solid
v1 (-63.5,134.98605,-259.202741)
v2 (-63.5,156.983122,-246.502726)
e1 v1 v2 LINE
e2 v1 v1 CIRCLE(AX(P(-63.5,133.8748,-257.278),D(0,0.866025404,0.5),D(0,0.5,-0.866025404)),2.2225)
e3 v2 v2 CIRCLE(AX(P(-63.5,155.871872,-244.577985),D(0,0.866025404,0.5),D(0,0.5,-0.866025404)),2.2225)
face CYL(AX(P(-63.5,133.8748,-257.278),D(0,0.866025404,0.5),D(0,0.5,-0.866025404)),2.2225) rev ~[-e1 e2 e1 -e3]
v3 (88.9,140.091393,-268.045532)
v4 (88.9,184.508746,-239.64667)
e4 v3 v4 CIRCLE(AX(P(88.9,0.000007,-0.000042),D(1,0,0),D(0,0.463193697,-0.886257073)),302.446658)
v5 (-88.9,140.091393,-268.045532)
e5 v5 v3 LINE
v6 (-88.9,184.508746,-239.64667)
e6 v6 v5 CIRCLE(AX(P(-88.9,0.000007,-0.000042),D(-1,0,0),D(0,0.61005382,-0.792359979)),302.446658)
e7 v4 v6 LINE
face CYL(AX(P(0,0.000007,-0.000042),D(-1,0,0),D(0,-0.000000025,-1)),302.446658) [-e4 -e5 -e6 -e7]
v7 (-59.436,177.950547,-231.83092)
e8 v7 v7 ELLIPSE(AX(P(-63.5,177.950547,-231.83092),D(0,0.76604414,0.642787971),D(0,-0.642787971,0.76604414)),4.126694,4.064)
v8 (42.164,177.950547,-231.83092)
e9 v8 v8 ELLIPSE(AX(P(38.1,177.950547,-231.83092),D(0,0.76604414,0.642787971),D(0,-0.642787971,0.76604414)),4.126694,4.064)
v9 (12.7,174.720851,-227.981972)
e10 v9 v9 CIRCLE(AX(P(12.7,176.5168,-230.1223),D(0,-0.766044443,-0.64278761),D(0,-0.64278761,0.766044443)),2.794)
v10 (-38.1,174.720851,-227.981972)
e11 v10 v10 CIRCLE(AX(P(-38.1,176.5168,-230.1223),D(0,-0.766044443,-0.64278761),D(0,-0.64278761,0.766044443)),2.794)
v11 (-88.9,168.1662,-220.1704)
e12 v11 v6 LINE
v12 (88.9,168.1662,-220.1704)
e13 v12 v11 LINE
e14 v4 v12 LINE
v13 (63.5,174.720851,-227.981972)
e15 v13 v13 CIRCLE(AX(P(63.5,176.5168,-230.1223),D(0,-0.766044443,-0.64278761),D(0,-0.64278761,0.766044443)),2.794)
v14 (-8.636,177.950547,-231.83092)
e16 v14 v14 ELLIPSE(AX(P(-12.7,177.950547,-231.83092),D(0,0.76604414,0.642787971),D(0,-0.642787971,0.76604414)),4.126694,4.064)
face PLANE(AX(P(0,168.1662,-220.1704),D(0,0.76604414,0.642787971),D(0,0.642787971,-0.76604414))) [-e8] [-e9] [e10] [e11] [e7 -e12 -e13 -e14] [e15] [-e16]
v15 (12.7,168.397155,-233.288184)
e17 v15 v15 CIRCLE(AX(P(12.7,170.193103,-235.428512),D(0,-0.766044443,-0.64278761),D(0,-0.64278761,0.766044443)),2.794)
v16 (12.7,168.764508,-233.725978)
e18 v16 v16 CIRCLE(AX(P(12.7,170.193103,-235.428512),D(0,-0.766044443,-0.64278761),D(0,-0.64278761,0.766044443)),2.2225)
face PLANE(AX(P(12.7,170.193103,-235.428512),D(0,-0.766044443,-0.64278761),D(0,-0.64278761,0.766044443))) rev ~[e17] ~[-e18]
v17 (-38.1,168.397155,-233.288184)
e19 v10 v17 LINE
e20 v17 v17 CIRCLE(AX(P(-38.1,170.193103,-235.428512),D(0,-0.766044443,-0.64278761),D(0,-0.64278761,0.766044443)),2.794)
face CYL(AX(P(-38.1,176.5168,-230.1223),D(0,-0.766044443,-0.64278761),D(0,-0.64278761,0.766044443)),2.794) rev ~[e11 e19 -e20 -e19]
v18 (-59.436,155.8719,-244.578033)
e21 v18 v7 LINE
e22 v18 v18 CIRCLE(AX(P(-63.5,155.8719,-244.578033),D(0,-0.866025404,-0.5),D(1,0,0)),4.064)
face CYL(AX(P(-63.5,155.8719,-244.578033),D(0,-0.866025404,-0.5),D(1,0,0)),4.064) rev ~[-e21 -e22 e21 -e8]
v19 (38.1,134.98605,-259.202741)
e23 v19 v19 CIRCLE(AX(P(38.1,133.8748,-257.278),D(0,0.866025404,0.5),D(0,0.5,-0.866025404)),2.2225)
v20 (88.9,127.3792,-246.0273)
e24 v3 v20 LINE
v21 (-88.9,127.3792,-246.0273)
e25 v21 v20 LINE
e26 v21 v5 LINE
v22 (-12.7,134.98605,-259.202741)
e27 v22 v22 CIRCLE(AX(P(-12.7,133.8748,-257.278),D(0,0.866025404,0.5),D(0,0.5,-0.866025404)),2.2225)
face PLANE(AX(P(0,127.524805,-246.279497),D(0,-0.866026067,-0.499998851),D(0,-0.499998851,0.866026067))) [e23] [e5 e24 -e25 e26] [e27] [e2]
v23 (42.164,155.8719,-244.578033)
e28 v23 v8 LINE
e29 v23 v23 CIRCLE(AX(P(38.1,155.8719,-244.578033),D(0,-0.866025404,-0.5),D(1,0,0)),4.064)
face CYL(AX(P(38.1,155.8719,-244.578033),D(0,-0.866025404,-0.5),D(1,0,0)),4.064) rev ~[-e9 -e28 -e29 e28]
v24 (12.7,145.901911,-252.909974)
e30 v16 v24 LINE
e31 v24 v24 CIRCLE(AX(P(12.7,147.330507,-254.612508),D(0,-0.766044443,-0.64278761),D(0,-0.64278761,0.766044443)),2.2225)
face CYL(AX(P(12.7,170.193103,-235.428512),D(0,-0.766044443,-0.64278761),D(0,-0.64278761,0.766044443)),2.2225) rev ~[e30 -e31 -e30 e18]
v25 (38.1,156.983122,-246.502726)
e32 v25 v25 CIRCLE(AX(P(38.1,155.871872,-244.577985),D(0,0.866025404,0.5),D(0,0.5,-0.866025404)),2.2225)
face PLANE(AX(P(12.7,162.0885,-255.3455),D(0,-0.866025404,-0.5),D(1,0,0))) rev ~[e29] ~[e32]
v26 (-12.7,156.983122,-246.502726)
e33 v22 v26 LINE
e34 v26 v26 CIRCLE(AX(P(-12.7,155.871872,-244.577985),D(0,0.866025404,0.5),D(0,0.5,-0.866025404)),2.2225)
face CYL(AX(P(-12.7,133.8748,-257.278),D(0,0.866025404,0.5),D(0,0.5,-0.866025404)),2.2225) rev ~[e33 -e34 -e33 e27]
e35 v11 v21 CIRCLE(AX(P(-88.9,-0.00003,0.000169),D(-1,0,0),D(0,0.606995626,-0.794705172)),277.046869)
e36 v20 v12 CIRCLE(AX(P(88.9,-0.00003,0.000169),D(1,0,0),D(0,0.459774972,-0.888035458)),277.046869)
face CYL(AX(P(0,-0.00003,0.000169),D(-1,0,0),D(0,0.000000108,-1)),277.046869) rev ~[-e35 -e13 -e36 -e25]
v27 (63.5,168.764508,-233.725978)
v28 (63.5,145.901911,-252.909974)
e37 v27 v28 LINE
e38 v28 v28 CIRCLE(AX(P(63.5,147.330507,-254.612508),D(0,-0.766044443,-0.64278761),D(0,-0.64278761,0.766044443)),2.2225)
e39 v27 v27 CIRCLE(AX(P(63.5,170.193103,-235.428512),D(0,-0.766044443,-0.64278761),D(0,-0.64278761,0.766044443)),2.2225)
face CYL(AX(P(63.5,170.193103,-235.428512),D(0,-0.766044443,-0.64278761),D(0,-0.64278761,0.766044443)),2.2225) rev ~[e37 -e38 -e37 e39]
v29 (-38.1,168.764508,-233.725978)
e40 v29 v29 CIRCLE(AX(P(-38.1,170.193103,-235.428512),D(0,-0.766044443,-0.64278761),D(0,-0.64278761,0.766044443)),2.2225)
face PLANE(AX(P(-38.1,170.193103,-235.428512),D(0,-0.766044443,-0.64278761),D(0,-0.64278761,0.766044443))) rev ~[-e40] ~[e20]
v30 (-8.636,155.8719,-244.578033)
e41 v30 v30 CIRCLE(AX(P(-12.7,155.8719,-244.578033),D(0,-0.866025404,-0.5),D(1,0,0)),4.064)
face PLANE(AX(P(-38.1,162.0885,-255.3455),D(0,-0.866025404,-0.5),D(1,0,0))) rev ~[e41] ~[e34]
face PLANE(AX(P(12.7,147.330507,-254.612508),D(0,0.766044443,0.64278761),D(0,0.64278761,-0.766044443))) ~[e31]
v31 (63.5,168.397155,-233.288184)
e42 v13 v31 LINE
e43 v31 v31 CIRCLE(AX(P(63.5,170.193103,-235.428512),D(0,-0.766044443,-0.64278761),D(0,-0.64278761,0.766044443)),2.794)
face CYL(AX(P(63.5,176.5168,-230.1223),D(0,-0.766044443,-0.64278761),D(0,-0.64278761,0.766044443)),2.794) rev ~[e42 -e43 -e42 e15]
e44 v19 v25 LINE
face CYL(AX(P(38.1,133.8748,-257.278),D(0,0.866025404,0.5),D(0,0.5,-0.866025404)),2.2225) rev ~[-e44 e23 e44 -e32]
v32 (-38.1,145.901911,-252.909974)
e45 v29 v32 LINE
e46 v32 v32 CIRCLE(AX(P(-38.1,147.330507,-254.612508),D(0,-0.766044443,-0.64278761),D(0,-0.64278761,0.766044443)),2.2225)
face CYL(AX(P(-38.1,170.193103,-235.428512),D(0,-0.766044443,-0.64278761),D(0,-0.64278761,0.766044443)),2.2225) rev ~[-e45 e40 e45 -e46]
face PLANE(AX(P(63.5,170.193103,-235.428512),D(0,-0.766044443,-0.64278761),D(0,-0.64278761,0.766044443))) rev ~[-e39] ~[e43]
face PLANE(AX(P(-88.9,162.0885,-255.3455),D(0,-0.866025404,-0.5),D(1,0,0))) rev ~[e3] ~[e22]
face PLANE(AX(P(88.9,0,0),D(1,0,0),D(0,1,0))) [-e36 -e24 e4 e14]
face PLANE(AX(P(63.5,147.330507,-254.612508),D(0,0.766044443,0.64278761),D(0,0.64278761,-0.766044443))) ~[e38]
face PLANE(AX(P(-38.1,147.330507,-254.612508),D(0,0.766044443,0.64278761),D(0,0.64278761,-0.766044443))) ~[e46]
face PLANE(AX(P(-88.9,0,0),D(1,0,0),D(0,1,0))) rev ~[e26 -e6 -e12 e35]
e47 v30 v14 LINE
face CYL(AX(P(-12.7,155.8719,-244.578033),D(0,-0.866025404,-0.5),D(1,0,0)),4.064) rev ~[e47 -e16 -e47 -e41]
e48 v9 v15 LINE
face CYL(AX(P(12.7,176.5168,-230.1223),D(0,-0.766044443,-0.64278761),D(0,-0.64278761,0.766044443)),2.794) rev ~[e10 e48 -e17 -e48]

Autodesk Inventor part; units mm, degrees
ref_plane "YZ Plane" through (0, 0, 0) normal (1, 0, 0) x (0, 1, 0)
ref_plane "XZ Plane" through (0, 0, 0) normal (0, 1, 0) x (-1, 0, 0)
sketch "Sketch1" plane through (0, 0, 0) normal (1, 0, 0) x (0, 1, 0)
  arc A0 (0, -277.0467) -> (178.0822, -212.2301) centre (0, 0) ccw
  arc A1 (0, -302.4467) -> (194.409, -231.6876) centre (0, 0) ccw
  line L0 (178.0822, -212.2301) -> (194.409, -231.6876)
  line L1 (0, -277.0467) -> (0, -302.4467)
  line L2 (168.1662, -220.1704) -> (184.6802, -239.851)
  line L3 (184.6802, -239.851) -> (204.1378, -223.5242)
  line L4 (204.1378, -223.5242) -> (187.811, -204.0667)
  line L5 (187.811, -204.0667) -> (168.3534, -220.3935)
  line L6 (168.3534, -220.3935) -> (204.1378, -223.5242) construction
  line L7 (184.6802, -239.851) -> (187.811, -204.0667) construction
  arc A2 (0, -277.0467) -> (138.5234, -239.9295) centre (0, 0) ccw
  line L8 (138.5234, -239.9295) -> (151.2234, -261.9266)
  line L9 (162.2219, -255.5766) -> (140.2248, -268.2766)
  line L10 (140.2248, -268.2766) -> (127.3792, -246.0273)
  line L11 (127.5248, -246.2795) -> (149.5219, -233.5795)
  line L12 (149.5219, -233.5795) -> (162.2219, -255.5766)
  line L13 (162.2219, -255.5766) -> (127.5248, -246.2795) construction
  line L14 (140.2248, -268.2766) -> (149.5219, -233.5795) construction
  point P0 (186.2456, -221.9589)
  point P1 (184.5088, -239.6467)
  point P2 (144.8734, -250.928)
  point P3 (140.0915, -268.0455)
  dimension "d1" = 277.0467
  dimension "d2" = 40
  dimension "d4" = 25.4
  dimension "d5" = 25.4
  dimension "d32" = 30
  dimension "d33" = 25.4
extrude "Extrusion1" add sketch "Sketch1" along normal mid plane 177.8 contours A0 L11 L10 | L11 L12 A1 L8 | L8 A1 L10 L11 | A0 L2 A1 L12 L11
sketch "Sketch3" plane through (-88.9, 168.1662, -220.1704) normal (0, 0.7660444, 0.6427876) x (1, 0, 0)
  line L0 (88.9, 0) -> (88.9, 25.6912) projected
  line L1 (177.8, 25.4245) -> (177.8, 0) projected
  point P0 (88.9, -276.7555)
  point P1 (152.4, 12.9912)
  dimension "d17" = 25.4
  dimension "d18" = 12.7
hole "Hole2" at (63.5, 176.5168, -230.1223) direction (0, -0.7660444, -0.6427876) diameter 4.445 depth 38.1 counterbore diameter 5.588 counterbore depth 8.255
pattern_linear "Rectangular Pattern2" count 3 spacing 50.8 along (-1, 0, 0) of "Hole2"
sketch "Sketch5" plane through (-88.9, 140.2248, -268.2766) normal (0, -0.8660254, -0.5) x (1, 0, 0)
  point P0 (88.9, 302.4467)
sketch "Sketch6" plane through (-88.9, 140.2248, -268.2766) normal (0, -0.8660254, -0.5) x (1, 0, 0)
  line L0 (0, 0.2668) -> (0, 25.6912) projected
  line L1 (0, 25.6912) -> (177.8, 25.6912) projected
  point P0 (88.9, 302.4467)
  point P1 (25.4, 12.7)
  dimension "d50" = 25.4
  dimension "d51" = 12.9912
hole "Hole3" at (-63.5, 133.8748, -257.278) direction (0, 0.8660254, 0.5) diameter 4.445 end through all
ref_plane "Work Plane1" through (-88.9, 162.0885, -255.3455) normal (0, -0.8660254, -0.5) x (1, 0, 0)
sketch "Sketch7" plane through (-88.9, 162.0885, -255.3455) normal (0, -0.8660254, -0.5) x (1, 0, 0)
  circle A0 centre (25.4, 12.4332) radius 2.2225 projected
  circle A1 centre (25.4, 12.4332) radius 4.064
  point P0 (88.9, 302.18)
  dimension "d44" = 8.128
extrude "Extrusion2" cut sketch "Sketch7" against normal through all contours A0 | A1
pattern_linear "Rectangular Pattern3" count 3 spacing 50.8 along (1, 0, 0) of "Extrusion2", "Hole3"
properties part number "HoodBraceExtension"
